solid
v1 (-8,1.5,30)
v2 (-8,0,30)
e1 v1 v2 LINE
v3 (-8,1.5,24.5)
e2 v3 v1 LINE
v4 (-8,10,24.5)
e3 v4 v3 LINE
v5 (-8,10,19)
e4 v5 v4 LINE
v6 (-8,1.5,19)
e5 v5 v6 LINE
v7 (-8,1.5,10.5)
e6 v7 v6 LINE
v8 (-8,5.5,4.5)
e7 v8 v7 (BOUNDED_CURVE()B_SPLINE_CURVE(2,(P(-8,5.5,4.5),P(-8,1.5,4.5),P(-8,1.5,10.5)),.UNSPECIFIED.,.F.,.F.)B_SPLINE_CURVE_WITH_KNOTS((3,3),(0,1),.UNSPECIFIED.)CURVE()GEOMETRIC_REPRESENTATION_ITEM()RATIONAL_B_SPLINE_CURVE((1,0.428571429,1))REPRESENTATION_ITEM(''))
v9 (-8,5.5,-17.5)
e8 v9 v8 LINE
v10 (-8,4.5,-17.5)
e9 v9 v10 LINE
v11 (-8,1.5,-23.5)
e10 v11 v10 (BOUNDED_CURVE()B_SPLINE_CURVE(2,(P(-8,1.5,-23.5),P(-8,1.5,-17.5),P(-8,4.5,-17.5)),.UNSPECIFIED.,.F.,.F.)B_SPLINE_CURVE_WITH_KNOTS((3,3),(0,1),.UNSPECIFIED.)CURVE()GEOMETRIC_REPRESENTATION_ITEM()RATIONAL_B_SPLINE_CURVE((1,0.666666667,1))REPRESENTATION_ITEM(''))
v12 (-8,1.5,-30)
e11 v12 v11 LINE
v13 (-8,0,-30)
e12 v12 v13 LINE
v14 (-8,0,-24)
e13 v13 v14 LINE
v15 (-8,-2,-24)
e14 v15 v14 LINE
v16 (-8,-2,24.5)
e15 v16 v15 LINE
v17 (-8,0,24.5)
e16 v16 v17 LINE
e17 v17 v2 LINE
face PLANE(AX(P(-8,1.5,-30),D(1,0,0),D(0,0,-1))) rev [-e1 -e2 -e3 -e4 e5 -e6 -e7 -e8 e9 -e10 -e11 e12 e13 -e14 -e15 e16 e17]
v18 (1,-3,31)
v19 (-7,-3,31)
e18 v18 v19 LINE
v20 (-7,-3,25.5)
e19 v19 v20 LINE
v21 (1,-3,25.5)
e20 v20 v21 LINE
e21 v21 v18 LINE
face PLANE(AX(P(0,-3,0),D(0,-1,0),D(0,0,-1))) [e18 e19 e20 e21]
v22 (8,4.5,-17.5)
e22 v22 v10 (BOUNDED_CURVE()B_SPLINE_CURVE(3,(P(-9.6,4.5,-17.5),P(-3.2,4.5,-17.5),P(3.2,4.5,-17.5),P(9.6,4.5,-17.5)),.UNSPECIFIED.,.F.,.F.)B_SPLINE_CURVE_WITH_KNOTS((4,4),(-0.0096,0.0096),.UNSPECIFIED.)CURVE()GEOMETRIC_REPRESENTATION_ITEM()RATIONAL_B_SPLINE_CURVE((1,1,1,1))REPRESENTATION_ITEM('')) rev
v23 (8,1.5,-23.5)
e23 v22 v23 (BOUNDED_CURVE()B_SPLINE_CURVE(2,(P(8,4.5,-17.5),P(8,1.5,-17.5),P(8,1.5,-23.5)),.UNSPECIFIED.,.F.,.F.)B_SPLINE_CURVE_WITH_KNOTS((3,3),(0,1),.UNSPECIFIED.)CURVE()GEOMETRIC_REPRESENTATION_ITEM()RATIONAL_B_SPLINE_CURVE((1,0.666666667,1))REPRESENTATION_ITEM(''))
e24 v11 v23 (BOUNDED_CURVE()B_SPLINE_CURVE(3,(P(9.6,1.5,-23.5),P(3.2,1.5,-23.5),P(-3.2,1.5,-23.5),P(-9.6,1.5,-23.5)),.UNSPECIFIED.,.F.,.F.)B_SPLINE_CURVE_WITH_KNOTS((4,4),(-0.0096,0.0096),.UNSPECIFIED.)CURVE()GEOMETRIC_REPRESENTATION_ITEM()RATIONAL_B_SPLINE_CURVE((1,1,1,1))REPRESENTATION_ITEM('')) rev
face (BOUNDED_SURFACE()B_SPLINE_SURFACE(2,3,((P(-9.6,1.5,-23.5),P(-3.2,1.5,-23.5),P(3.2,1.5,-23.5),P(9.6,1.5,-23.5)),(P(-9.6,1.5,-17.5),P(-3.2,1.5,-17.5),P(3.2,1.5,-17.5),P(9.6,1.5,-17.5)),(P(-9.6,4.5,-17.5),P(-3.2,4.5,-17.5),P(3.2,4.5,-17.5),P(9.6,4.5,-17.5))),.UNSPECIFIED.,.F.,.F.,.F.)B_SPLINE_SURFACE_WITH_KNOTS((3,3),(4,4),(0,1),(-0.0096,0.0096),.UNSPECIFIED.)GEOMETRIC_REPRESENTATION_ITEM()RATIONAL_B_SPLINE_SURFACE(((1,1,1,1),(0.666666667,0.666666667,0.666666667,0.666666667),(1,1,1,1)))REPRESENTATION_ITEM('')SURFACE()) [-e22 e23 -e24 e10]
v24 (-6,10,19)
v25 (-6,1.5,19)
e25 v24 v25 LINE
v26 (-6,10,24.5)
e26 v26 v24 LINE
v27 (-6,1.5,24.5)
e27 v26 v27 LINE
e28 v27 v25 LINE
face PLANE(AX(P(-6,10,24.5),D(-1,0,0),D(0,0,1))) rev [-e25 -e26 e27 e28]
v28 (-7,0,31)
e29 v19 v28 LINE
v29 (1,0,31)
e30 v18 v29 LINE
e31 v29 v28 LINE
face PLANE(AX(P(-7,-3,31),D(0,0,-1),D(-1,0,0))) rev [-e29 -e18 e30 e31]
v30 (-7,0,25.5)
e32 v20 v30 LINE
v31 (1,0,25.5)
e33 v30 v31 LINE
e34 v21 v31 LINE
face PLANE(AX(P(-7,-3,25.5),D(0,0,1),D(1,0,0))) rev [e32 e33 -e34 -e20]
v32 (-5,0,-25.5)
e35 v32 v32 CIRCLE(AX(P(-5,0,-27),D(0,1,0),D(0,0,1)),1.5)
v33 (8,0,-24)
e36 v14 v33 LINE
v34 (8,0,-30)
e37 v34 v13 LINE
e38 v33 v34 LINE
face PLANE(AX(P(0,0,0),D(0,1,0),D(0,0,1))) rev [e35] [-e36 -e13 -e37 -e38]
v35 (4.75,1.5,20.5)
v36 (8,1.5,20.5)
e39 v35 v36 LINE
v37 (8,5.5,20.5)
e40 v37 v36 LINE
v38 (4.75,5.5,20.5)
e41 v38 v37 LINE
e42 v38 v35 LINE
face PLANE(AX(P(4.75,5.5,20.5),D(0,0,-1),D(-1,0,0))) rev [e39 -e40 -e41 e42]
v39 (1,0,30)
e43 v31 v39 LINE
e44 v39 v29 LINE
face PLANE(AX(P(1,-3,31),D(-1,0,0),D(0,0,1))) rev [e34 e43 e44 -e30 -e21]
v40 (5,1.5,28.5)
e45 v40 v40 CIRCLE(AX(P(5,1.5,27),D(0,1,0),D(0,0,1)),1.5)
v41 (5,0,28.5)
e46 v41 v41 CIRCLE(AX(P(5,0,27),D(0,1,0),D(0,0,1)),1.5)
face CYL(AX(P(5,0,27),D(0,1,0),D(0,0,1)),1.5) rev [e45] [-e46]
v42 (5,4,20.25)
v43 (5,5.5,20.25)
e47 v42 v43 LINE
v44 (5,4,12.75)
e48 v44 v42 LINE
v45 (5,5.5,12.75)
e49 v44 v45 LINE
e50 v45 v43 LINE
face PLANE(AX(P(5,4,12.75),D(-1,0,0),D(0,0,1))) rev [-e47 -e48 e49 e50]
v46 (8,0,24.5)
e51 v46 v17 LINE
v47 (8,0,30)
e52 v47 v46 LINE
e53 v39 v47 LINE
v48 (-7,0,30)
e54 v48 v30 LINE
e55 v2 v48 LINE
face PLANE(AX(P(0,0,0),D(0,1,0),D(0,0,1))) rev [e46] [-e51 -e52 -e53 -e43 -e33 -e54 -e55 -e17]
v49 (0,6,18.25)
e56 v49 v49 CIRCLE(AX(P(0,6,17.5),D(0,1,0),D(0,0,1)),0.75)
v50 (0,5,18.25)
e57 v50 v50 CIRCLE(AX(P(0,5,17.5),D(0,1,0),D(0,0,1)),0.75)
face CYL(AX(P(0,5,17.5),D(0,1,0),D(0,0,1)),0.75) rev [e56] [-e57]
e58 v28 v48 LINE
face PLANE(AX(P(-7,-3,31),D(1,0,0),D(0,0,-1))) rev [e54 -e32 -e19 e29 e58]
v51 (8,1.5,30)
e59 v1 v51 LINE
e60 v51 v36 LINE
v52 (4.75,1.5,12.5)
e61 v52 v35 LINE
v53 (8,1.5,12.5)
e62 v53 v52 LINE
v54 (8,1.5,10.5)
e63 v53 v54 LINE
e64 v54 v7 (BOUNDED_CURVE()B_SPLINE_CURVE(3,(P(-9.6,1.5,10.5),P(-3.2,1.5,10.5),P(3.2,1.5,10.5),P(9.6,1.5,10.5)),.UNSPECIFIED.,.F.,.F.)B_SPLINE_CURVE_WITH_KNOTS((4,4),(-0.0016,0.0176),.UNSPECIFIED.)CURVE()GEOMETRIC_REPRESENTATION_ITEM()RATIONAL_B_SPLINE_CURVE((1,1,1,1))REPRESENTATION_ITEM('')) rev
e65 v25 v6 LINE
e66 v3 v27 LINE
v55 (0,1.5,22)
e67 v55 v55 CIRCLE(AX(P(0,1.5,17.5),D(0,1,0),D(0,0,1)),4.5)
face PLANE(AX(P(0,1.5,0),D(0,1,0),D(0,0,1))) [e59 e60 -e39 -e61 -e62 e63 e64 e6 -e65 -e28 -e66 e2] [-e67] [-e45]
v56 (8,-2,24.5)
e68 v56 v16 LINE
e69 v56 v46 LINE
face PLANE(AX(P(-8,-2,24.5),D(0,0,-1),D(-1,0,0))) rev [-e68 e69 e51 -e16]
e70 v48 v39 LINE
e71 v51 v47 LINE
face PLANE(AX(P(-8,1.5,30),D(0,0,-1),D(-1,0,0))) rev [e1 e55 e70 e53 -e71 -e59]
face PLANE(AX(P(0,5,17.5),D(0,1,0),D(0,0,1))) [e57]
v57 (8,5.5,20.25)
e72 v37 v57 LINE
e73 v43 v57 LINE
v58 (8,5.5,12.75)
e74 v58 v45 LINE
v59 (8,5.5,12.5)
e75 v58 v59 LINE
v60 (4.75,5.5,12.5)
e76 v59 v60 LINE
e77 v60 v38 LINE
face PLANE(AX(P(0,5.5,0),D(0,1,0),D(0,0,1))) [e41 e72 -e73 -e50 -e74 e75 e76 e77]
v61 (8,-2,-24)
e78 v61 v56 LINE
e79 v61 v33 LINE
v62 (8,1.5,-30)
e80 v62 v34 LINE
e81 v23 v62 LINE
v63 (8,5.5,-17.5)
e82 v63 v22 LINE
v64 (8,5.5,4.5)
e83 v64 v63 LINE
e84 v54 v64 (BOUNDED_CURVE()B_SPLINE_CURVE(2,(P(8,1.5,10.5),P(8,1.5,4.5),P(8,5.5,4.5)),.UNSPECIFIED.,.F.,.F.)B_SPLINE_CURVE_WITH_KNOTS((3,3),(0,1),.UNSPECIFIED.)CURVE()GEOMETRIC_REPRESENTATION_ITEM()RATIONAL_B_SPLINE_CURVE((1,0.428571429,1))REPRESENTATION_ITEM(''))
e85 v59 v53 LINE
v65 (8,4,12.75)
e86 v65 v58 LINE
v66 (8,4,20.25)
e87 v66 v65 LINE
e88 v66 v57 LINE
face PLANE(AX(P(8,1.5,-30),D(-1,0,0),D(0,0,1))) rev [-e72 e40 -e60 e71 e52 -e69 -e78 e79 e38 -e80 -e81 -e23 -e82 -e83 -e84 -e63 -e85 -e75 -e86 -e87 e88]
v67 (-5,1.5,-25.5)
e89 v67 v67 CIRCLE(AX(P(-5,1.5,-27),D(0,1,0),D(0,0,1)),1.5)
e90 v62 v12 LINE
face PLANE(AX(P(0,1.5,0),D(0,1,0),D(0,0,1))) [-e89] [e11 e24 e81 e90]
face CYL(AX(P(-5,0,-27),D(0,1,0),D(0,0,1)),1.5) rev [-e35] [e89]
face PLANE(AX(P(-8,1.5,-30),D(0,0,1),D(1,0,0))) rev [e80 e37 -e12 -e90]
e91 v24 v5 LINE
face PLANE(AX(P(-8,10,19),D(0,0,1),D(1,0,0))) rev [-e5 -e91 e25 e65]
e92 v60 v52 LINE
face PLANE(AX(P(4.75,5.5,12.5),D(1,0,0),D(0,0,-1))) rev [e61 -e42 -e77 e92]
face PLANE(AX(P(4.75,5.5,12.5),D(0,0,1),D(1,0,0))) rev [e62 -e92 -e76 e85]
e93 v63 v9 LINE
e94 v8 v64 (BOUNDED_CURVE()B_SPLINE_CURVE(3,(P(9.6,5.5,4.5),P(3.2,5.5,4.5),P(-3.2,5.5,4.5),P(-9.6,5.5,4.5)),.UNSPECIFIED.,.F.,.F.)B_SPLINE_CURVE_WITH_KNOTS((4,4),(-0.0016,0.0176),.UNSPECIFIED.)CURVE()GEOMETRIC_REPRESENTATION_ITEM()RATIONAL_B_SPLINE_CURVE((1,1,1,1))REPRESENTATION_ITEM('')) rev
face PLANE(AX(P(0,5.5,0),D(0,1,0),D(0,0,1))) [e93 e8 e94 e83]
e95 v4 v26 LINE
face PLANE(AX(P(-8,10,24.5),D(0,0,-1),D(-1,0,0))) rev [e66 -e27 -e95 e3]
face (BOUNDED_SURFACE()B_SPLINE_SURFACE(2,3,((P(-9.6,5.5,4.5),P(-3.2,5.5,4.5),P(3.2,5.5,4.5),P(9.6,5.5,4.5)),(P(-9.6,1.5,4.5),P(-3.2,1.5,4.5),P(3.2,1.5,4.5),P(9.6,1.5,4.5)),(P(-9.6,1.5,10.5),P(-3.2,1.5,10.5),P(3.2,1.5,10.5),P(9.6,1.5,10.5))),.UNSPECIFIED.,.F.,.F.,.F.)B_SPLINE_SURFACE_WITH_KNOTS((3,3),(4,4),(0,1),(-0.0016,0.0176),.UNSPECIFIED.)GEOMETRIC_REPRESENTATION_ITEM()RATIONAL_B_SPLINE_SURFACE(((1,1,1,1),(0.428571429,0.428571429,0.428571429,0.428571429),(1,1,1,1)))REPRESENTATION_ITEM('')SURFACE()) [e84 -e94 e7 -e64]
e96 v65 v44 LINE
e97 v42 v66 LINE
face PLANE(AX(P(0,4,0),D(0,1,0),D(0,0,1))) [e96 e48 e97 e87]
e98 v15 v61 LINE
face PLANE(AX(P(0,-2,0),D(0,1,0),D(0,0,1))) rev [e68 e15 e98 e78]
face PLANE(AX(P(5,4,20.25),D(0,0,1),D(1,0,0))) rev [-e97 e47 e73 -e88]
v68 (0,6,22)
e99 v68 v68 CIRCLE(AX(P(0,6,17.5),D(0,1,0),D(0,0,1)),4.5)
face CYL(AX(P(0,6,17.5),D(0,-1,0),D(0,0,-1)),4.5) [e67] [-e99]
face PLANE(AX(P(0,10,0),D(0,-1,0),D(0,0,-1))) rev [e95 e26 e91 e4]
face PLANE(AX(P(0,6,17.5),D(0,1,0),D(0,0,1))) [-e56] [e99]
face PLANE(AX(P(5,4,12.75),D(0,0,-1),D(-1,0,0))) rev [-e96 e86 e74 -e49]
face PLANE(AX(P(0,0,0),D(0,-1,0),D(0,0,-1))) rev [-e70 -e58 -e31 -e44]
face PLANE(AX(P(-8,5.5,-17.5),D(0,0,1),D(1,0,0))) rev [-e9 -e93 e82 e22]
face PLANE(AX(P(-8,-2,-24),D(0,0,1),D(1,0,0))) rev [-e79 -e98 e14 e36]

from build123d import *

# Parameters (mm, degrees)
SKETCH1_W           = 16
SKETCH1_H           = 60
BOSS_EXTRUDE1_DEPTH = 1.5
SKETCH5_R           = 1.5
CUT_EXTRUDE1_DEPTH  = 32.084562085
SKETCH8_W           = 16
SKETCH8_H           = 22
BOSS_EXTRUDE2_DEPTH = 4
FILLET1_START       = -8
FILLET1_DEPTH       = 16
FILLET2_START       = -8
FILLET2_DEPTH       = 16
SKETCH12_W          = 3.25
SKETCH12_H          = 8
BOSS_EXTRUDE5_DEPTH = 4
SKETCH15_R          = 4.5
BOSS_EXTRUDE6_DEPTH = 4.5
SKETCH16_W          = 3
SKETCH16_H          = 7.5
CUT_EXTRUDE2_DEPTH  = 1.5
SKETCH17_R          = 0.75
CUT_EXTRUDE3_DEPTH  = 1
SKETCH18_W          = 2
SKETCH18_H          = 5.5
BOSS_EXTRUDE7_DEPTH = 8.5
SKETCH22_W          = 8
SKETCH22_H          = 5.5
BOSS_EXTRUDE8_DEPTH = 3
SKETCH23_W          = 16
SKETCH23_H          = 48.5
BOSS_EXTRUDE9_DEPTH = 2


with BuildPart() as part:
    # Sketch1 → Boss-Extrude1 (new body)
    with BuildSketch(Plane(origin=(0, 0, 0), x_dir=(1, 0, 0), z_dir=(0, 1, 0))):
        Rectangle(SKETCH1_W, SKETCH1_H)
    extrude(amount=BOSS_EXTRUDE1_DEPTH)

    # Sketch5 → Cut-Extrude1 (cut, through all)
    with BuildSketch(Plane(origin=(0, 1.5, 0), x_dir=(1, 0, 0), z_dir=(0, 1, 0))):
        with Locations(Location((-5, 27, 0), (0, 0, 270))):
            Circle(SKETCH5_R)
        with Locations(Location((5, -27, 0), (0, 0, 270))):
            Circle(SKETCH5_R)
    extrude(amount=-CUT_EXTRUDE1_DEPTH, mode=Mode.SUBTRACT)

    # Sketch8 → Boss-Extrude2 (add)
    with BuildSketch(Plane(origin=(0, 1.5, 0), x_dir=(1, 0, 0), z_dir=(0, 1, 0))):
        with Locations((0, 6.5)):
            Rectangle(SKETCH8_W, SKETCH8_H)
    extrude(amount=BOSS_EXTRUDE2_DEPTH)

    # Fillet1: read off the stored shape, not the designer's step
    # Fillet1 outline → Fillet1 (add)
    with BuildSketch(Plane.YZ.offset(FILLET1_START)):
        with BuildLine():
            Line((1.5, -17.5), (1.5, -23.5))
            add(Edge.make_bspline(
                [(1.5, -23.5), (1.5, -17.5), (4.5, -17.5)],
                knots=[0, 0, 0, 1, 1, 1], degree=2, weights=[1, 0.666666667, 1]))
            Line((4.5, -17.5), (1.5, -17.5))
        make_face()
    extrude(amount=FILLET1_DEPTH)

    # Fillet2: read off the stored shape, not the designer's step
    # Fillet2 outline → Fillet2 (add)
    with BuildSketch(Plane.YZ.offset(FILLET2_START)):
        with BuildLine():
            Line((1.5, 4.5), (5.5, 4.5))
            add(Edge.make_bspline(
                [(5.5, 4.5), (1.5, 4.5), (1.5, 10.5)],
                knots=[0, 0, 0, 1, 1, 1], degree=2, weights=[1, 0.428571429, 1]))
            Line((1.5, 10.5), (1.5, 4.5))
        make_face()
    extrude(amount=FILLET2_DEPTH)

    # Sketch12 → Boss-Extrude5 (add)
    with BuildSketch(Plane(origin=(0, 1.5, 0), x_dir=(1, 0, 0), z_dir=(0, 1, 0))):
        with Locations((6.375, -16.5)):
            Rectangle(SKETCH12_W, SKETCH12_H)
    extrude(amount=BOSS_EXTRUDE5_DEPTH)

    # Sketch15 → Boss-Extrude6 (add)
    with BuildSketch(Plane(origin=(0, 1.5, 0), x_dir=(1, 0, 0), z_dir=(0, 1, 0))):
        with Locations(Location((0, -17.5, 0), (0, 0, 270))):
            Circle(SKETCH15_R)
    extrude(amount=BOSS_EXTRUDE6_DEPTH)

    # Sketch16 → Cut-Extrude2 (cut)
    with BuildSketch(Plane(origin=(0, 5.5, 0), x_dir=(1, 0, 0), z_dir=(0, 1, 0))):
        with Locations((6.5, -16.5)):
            Rectangle(SKETCH16_W, SKETCH16_H)
    extrude(amount=-CUT_EXTRUDE2_DEPTH, mode=Mode.SUBTRACT)

    # Sketch17 → Cut-Extrude3 (cut)
    with BuildSketch(Plane(origin=(0, 6, 0), x_dir=(1, 0, 0), z_dir=(0, 1, 0))):
        with Locations(Location((0, -17.5, 0), (0, 0, 270))):
            Circle(SKETCH17_R)
    extrude(amount=-CUT_EXTRUDE3_DEPTH, mode=Mode.SUBTRACT)

    # Sketch18 → Boss-Extrude7 (add)
    with BuildSketch(Plane(origin=(0, 1.5, 0), x_dir=(1, 0, 0), z_dir=(0, 1, 0))):
        with Locations((-7, -21.75)):
            Rectangle(SKETCH18_W, SKETCH18_H)
    extrude(amount=BOSS_EXTRUDE7_DEPTH)

    # Sketch22 → Boss-Extrude8 (add)
    with BuildSketch(Plane.XZ):
        with Locations((-3, 28.25)):
            Rectangle(SKETCH22_W, SKETCH22_H)
    extrude(amount=BOSS_EXTRUDE8_DEPTH)

    # Sketch23 → Boss-Extrude9 (add)
    with BuildSketch(Plane.XZ):
        with Locations((0, 0.25)):
            Rectangle(SKETCH23_W, SKETCH23_H)
    extrude(amount=BOSS_EXTRUDE9_DEPTH)


solid = part.part
